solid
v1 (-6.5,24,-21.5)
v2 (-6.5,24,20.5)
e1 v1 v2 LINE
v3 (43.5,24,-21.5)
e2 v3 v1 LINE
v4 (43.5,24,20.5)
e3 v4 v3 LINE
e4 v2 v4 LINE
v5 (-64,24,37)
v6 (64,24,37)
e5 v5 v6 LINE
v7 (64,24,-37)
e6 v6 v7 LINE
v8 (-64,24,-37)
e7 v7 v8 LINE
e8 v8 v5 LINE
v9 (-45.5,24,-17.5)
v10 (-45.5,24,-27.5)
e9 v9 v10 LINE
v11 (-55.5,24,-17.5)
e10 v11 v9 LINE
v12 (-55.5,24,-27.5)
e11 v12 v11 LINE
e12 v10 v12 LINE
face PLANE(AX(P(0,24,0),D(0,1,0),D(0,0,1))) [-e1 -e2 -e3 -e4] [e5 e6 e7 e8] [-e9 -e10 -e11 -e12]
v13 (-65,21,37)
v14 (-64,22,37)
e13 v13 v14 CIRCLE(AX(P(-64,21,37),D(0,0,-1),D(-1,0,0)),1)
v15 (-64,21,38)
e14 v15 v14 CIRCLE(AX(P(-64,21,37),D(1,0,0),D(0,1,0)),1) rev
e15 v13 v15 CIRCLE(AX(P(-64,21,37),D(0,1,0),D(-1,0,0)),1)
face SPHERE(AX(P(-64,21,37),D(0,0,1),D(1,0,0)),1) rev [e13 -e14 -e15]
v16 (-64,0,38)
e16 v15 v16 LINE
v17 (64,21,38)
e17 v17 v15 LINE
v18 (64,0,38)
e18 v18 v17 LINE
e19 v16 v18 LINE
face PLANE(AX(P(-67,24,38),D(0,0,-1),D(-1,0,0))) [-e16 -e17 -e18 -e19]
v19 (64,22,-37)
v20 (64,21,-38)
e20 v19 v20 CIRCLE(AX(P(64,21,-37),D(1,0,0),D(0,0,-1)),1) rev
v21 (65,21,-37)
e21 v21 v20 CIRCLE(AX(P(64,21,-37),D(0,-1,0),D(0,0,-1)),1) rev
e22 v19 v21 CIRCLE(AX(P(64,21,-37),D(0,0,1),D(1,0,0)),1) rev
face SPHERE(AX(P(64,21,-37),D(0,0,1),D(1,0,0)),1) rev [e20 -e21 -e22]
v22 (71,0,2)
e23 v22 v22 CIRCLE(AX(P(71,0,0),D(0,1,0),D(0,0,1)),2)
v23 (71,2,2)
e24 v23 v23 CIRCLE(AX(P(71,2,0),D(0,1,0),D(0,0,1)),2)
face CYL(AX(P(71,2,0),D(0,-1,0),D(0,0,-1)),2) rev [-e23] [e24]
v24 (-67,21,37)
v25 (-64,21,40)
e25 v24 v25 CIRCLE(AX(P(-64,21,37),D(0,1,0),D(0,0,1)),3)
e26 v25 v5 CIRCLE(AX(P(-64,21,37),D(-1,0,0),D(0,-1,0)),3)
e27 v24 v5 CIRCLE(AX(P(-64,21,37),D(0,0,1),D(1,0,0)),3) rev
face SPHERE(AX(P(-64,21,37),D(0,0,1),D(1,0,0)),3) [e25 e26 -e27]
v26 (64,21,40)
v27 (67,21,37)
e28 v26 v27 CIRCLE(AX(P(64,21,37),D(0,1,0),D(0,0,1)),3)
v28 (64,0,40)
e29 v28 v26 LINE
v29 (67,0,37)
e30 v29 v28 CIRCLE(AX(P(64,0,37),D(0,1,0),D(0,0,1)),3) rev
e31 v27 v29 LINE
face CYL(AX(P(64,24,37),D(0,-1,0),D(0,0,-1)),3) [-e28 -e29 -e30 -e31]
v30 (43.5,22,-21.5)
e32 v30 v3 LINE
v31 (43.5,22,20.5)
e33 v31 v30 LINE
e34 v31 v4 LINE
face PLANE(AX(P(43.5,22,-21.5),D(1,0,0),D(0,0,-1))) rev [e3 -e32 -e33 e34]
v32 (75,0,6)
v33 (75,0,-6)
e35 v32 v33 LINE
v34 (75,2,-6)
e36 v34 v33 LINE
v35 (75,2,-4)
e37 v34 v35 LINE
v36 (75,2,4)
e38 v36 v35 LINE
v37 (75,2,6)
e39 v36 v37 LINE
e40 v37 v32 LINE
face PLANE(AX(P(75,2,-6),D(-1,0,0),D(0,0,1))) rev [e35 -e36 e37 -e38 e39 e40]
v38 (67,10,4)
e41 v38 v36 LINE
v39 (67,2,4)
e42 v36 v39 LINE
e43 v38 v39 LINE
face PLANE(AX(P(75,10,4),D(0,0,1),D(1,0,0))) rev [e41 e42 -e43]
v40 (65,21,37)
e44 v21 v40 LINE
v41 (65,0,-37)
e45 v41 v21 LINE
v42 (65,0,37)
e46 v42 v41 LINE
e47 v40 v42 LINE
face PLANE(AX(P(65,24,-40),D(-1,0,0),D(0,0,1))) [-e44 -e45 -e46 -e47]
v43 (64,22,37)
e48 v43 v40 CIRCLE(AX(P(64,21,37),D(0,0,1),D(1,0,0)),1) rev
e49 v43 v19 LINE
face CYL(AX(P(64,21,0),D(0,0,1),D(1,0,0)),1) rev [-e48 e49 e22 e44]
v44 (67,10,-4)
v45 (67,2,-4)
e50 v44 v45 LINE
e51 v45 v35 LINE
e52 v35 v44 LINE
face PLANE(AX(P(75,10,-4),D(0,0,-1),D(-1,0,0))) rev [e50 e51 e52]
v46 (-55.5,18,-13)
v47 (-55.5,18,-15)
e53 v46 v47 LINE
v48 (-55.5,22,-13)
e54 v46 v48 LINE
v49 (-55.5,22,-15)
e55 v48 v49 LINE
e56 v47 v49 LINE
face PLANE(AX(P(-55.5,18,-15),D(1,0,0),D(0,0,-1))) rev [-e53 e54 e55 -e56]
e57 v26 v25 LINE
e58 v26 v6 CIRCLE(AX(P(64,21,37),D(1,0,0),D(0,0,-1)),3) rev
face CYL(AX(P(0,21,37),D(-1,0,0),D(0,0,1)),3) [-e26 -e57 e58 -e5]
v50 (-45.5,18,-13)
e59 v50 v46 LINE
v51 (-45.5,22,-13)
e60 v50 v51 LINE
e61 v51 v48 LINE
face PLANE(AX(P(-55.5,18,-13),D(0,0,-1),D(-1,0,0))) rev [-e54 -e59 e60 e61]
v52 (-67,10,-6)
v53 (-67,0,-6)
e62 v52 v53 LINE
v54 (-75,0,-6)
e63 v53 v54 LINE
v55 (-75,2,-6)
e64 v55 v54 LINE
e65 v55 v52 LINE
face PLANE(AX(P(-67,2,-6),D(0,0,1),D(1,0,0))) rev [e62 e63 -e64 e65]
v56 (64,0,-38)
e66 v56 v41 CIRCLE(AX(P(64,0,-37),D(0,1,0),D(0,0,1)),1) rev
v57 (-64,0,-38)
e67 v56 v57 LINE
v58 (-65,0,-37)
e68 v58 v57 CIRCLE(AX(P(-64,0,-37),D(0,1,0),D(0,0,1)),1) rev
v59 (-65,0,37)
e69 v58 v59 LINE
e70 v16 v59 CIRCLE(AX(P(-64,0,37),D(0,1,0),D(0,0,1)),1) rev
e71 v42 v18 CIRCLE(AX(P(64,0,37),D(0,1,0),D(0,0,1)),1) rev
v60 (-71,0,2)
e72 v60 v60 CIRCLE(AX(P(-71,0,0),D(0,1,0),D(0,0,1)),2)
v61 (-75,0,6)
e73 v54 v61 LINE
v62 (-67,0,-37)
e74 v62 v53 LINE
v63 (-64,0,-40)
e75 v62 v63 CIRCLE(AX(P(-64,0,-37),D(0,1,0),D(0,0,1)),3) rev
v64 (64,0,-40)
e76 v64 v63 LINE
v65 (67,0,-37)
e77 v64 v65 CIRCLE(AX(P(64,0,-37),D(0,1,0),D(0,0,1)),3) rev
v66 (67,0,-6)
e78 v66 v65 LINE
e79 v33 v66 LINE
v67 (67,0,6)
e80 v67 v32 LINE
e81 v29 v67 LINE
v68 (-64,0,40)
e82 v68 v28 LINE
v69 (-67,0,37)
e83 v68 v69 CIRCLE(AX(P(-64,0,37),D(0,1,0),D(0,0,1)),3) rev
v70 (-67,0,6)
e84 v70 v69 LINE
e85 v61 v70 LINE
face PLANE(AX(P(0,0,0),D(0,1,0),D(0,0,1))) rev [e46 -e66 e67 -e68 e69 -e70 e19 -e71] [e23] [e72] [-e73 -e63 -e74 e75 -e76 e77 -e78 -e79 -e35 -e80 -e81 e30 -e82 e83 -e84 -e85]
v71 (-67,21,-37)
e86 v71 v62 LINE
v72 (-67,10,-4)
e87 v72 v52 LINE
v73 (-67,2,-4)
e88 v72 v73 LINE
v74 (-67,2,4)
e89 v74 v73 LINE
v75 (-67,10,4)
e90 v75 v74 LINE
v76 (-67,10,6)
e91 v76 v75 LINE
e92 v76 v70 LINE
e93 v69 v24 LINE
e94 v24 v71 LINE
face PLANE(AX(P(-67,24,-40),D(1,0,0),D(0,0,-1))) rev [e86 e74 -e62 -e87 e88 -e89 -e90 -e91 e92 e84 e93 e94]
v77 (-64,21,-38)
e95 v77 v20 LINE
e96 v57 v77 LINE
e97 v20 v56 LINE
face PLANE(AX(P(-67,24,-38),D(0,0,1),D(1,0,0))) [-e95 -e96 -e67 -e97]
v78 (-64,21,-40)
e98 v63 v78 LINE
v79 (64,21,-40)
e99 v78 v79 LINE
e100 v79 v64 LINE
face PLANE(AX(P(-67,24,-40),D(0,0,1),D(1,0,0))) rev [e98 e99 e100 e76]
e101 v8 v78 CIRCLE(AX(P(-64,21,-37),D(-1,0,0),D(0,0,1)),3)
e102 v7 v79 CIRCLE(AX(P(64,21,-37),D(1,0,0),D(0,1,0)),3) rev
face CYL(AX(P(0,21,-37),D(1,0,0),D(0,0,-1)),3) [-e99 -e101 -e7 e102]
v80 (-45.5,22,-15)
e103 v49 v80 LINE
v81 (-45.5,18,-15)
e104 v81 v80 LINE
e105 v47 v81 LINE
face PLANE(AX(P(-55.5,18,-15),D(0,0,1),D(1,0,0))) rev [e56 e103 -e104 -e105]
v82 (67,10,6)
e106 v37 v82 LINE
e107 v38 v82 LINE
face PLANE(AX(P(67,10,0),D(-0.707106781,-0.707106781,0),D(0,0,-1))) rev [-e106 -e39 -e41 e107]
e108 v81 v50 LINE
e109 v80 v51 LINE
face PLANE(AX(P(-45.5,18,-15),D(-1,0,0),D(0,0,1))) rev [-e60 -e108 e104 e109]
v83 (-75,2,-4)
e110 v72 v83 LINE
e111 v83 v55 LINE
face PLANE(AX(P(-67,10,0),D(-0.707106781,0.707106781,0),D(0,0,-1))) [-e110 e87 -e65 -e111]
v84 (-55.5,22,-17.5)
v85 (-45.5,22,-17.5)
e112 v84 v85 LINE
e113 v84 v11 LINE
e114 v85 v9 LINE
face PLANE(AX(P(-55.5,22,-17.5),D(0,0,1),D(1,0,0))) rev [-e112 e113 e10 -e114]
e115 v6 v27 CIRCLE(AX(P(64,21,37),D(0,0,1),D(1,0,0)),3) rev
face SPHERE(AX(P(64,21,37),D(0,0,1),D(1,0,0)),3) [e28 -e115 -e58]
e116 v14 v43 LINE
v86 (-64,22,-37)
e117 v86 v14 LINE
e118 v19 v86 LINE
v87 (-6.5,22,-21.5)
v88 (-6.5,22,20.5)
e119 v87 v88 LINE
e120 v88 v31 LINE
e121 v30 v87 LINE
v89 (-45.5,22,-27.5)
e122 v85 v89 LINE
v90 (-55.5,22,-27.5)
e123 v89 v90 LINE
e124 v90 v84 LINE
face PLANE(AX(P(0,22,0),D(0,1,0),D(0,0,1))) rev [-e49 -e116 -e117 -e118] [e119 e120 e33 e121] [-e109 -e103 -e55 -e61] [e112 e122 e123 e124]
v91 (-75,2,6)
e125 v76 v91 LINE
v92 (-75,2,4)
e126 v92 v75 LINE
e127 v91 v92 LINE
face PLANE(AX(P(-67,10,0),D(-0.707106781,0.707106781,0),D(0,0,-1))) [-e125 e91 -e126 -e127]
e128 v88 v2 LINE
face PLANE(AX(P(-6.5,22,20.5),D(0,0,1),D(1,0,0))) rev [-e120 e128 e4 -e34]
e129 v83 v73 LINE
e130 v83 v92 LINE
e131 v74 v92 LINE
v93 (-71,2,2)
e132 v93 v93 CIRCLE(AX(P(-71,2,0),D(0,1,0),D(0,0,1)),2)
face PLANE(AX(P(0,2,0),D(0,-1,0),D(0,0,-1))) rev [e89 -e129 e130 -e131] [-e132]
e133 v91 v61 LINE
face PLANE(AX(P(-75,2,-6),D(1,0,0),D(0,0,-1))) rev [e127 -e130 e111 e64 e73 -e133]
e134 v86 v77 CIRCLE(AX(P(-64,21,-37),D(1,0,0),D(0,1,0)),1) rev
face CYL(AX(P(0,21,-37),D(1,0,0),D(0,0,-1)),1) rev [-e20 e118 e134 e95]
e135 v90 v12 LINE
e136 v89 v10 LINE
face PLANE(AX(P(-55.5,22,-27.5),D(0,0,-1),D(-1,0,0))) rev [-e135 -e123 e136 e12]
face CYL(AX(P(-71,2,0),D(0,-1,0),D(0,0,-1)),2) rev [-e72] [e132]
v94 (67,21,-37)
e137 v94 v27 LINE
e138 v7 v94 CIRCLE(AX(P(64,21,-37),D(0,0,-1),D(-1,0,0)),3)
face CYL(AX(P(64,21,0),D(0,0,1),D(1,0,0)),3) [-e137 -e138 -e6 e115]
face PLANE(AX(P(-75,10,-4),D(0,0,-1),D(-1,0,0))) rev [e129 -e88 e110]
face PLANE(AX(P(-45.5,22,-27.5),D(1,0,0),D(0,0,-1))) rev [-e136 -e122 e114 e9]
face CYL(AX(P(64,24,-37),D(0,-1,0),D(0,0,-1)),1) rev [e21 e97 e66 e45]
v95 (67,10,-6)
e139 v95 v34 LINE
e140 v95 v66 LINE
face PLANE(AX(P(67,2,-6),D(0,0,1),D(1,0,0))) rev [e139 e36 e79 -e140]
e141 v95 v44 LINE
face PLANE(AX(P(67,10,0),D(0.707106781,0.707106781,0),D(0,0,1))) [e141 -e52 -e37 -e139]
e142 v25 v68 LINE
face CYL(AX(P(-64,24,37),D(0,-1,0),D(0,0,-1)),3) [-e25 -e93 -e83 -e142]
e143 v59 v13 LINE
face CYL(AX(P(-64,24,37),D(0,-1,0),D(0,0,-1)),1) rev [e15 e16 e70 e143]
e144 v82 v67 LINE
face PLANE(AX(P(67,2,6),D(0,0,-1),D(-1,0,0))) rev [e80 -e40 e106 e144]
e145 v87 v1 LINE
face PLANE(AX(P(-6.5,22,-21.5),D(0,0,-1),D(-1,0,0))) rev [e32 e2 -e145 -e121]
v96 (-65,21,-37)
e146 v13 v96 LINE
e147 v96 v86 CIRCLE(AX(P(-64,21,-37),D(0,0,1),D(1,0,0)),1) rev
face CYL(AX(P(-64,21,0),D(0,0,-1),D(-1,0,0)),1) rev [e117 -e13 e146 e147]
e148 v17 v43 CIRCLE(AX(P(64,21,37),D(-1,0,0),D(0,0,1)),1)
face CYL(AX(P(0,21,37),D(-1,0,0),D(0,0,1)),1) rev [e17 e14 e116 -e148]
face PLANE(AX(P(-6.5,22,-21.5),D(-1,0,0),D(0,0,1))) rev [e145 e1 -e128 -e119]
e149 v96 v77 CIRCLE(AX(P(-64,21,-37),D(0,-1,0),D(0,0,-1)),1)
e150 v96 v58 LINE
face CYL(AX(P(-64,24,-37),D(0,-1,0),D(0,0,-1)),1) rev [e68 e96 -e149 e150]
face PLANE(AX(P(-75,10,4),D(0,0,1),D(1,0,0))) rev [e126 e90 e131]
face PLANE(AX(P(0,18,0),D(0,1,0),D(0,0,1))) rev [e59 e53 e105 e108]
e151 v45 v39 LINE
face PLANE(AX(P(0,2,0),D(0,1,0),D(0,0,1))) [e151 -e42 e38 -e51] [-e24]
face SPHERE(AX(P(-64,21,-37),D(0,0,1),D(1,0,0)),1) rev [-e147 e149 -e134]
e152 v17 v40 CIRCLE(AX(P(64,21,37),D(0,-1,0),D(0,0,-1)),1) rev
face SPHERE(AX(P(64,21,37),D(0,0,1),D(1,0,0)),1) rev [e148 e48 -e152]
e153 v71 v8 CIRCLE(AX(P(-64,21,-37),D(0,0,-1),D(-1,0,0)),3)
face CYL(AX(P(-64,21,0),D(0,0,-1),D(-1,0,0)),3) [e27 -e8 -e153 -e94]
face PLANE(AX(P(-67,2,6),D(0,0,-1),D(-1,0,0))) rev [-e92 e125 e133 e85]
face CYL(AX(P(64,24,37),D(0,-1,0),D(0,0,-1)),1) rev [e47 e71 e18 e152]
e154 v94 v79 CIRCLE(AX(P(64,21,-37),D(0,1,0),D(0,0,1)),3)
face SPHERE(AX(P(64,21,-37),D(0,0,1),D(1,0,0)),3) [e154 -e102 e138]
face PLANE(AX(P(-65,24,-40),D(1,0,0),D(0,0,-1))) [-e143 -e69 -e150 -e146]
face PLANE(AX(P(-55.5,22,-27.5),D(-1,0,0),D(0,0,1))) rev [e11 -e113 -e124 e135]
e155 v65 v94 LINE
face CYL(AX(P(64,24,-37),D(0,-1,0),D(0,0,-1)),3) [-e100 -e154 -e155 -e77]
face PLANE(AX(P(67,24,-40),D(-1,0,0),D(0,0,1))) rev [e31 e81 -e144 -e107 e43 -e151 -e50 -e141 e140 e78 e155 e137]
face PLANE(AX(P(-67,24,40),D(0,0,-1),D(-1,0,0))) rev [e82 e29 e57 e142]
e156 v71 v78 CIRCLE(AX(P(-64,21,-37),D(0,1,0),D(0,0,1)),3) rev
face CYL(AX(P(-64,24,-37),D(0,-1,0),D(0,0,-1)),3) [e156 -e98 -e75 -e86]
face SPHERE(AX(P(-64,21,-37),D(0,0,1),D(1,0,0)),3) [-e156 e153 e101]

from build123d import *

# Parameters (mm, degrees)
SKETCH_1_W          = 134
SKETCH_1_H          = 80
EXTRUDE_352_DEPTH   = 24
FILLET_1_R          = 3
SHELL_1_T           = -2
SKETCH_2_W          = 50
SKETCH_2_H          = 42
SKETCH_2_W_2        = 10
SKETCH_2_H_2        = 10
CUT_EXTRUDE_1_DEPTH = 2
SKETCH_3_W          = 8
SKETCH_3_H          = 12
SKETCH_3_R          = 2
EXTRUDE_1169_DEPTH  = 2
SKETCH_4_W          = 8
SKETCH_4_H          = 2
EXTRUDE_3_DEPTH     = 8
SKETCH_5_W          = 8
SKETCH_5_H          = 2
EXTRUDE_4_DEPTH     = 8
CHAMFER_1_SIZE      = 8
SKETCH_6_W          = 10
SKETCH_6_H          = 2
EXTRUDE_5_DEPTH     = 4


with BuildPart() as part:
    # Эскиз1 → Extrude 352 (new body)
    with BuildSketch(Plane(origin=(0, 0, 0), x_dir=(1, 0, 0), z_dir=(0, 1, 0))):
        Rectangle(SKETCH_1_W, SKETCH_1_H)
    extrude(amount=EXTRUDE_352_DEPTH)

    # Скругление1
    fillet_1_edges = [part.edges().sort_by_distance(p)[0] for p in [
        (67, 24, 0),
        (0, 24, -40),
        (-67, 24, 0),
        (0, 24, 40),
        (-67, 12, -40),
        (67, 12, -40),
        (67, 12, 40),
        (-67, 12, 40),
    ]]
    fillet(fillet_1_edges, radius=FILLET_1_R)

    # Оболочка1
    shell_1_openings = [part.faces().sort_by_distance(p)[0] for p in [
        (0, 0, 0),
    ]]
    offset(amount=SHELL_1_T, openings=shell_1_openings, kind=Kind.INTERSECTION)

    # Эскиз2 → Вырез-Вытянуть1 (cut)
    with BuildSketch(Plane(origin=(0, 24, 0), x_dir=(1, 0, 0), z_dir=(0, 1, 0))):
        with Locations((18.5, 0.5)):
            Rectangle(SKETCH_2_W, SKETCH_2_H)
        with Locations((-50.5, 22.5)):
            Rectangle(SKETCH_2_W_2, SKETCH_2_H_2)
    extrude(amount=-CUT_EXTRUDE_1_DEPTH, mode=Mode.SUBTRACT)

    # Эскиз3 → Extrude 1169 (add)
    # profile 1 of 2: a face of its own
    with BuildSketch(Plane(origin=(0, 0, 0), x_dir=(1, 0, 0), z_dir=(0, 1, 0))):
        with Locations((-71, 0)):
            Rectangle(SKETCH_3_W, SKETCH_3_H)
        with Locations(Location((-71, 0, 0), (0, 0, 270))):
            Circle(SKETCH_3_R, mode=Mode.SUBTRACT)
    # profile 2 of 2: a face of its own
    with BuildSketch(Plane(origin=(0, 0, 0), x_dir=(1, 0, 0), z_dir=(0, 1, 0))):
        with Locations((71, 0)):
            Rectangle(SKETCH_3_W, SKETCH_3_H)
        with Locations(Location((71, 0, 0), (0, 0, 270))):
            Circle(SKETCH_3_R, mode=Mode.SUBTRACT)
    extrude(amount=EXTRUDE_1169_DEPTH)

    # Эскиз4 → Бобышка-Вытянуть3 (add)
    with BuildSketch(Plane(origin=(0, 2, 0), x_dir=(1, 0, 0), z_dir=(0, 1, 0))):
        with Locations((-71, 5)):
            Rectangle(SKETCH_4_W, SKETCH_4_H)
        with Locations((-71, -5)):
            Rectangle(SKETCH_4_W, SKETCH_4_H)
    extrude(amount=EXTRUDE_3_DEPTH)

    # Эскиз5 → Бобышка-Вытянуть4 (add)
    with BuildSketch(Plane(origin=(0, 2, 0), x_dir=(1, 0, 0), z_dir=(0, 1, 0))):
        with Locations((71, 5)):
            Rectangle(SKETCH_5_W, SKETCH_5_H)
        with Locations((71, -5)):
            Rectangle(SKETCH_5_W, SKETCH_5_H)
    extrude(amount=EXTRUDE_4_DEPTH)

    # Фаска1
    chamfer_1_edges = [part.edges().sort_by_distance(p)[0] for p in [
        (75, 10, 5),
        (75, 10, -5),
        (-75, 10, 5),
        (-75, 10, -5),
    ]]
    chamfer(chamfer_1_edges, length=CHAMFER_1_SIZE - 0.0001)  # a hair under: the kernel refuses the full size

    # Эскиз6 → Бобышка-Вытянуть5 (add)
    with BuildSketch(Plane.XZ.offset(-22)):
        with Locations((-50.5, -14)):
            Rectangle(SKETCH_6_W, SKETCH_6_H)
    extrude(amount=EXTRUDE_5_DEPTH)


solid = part.part
